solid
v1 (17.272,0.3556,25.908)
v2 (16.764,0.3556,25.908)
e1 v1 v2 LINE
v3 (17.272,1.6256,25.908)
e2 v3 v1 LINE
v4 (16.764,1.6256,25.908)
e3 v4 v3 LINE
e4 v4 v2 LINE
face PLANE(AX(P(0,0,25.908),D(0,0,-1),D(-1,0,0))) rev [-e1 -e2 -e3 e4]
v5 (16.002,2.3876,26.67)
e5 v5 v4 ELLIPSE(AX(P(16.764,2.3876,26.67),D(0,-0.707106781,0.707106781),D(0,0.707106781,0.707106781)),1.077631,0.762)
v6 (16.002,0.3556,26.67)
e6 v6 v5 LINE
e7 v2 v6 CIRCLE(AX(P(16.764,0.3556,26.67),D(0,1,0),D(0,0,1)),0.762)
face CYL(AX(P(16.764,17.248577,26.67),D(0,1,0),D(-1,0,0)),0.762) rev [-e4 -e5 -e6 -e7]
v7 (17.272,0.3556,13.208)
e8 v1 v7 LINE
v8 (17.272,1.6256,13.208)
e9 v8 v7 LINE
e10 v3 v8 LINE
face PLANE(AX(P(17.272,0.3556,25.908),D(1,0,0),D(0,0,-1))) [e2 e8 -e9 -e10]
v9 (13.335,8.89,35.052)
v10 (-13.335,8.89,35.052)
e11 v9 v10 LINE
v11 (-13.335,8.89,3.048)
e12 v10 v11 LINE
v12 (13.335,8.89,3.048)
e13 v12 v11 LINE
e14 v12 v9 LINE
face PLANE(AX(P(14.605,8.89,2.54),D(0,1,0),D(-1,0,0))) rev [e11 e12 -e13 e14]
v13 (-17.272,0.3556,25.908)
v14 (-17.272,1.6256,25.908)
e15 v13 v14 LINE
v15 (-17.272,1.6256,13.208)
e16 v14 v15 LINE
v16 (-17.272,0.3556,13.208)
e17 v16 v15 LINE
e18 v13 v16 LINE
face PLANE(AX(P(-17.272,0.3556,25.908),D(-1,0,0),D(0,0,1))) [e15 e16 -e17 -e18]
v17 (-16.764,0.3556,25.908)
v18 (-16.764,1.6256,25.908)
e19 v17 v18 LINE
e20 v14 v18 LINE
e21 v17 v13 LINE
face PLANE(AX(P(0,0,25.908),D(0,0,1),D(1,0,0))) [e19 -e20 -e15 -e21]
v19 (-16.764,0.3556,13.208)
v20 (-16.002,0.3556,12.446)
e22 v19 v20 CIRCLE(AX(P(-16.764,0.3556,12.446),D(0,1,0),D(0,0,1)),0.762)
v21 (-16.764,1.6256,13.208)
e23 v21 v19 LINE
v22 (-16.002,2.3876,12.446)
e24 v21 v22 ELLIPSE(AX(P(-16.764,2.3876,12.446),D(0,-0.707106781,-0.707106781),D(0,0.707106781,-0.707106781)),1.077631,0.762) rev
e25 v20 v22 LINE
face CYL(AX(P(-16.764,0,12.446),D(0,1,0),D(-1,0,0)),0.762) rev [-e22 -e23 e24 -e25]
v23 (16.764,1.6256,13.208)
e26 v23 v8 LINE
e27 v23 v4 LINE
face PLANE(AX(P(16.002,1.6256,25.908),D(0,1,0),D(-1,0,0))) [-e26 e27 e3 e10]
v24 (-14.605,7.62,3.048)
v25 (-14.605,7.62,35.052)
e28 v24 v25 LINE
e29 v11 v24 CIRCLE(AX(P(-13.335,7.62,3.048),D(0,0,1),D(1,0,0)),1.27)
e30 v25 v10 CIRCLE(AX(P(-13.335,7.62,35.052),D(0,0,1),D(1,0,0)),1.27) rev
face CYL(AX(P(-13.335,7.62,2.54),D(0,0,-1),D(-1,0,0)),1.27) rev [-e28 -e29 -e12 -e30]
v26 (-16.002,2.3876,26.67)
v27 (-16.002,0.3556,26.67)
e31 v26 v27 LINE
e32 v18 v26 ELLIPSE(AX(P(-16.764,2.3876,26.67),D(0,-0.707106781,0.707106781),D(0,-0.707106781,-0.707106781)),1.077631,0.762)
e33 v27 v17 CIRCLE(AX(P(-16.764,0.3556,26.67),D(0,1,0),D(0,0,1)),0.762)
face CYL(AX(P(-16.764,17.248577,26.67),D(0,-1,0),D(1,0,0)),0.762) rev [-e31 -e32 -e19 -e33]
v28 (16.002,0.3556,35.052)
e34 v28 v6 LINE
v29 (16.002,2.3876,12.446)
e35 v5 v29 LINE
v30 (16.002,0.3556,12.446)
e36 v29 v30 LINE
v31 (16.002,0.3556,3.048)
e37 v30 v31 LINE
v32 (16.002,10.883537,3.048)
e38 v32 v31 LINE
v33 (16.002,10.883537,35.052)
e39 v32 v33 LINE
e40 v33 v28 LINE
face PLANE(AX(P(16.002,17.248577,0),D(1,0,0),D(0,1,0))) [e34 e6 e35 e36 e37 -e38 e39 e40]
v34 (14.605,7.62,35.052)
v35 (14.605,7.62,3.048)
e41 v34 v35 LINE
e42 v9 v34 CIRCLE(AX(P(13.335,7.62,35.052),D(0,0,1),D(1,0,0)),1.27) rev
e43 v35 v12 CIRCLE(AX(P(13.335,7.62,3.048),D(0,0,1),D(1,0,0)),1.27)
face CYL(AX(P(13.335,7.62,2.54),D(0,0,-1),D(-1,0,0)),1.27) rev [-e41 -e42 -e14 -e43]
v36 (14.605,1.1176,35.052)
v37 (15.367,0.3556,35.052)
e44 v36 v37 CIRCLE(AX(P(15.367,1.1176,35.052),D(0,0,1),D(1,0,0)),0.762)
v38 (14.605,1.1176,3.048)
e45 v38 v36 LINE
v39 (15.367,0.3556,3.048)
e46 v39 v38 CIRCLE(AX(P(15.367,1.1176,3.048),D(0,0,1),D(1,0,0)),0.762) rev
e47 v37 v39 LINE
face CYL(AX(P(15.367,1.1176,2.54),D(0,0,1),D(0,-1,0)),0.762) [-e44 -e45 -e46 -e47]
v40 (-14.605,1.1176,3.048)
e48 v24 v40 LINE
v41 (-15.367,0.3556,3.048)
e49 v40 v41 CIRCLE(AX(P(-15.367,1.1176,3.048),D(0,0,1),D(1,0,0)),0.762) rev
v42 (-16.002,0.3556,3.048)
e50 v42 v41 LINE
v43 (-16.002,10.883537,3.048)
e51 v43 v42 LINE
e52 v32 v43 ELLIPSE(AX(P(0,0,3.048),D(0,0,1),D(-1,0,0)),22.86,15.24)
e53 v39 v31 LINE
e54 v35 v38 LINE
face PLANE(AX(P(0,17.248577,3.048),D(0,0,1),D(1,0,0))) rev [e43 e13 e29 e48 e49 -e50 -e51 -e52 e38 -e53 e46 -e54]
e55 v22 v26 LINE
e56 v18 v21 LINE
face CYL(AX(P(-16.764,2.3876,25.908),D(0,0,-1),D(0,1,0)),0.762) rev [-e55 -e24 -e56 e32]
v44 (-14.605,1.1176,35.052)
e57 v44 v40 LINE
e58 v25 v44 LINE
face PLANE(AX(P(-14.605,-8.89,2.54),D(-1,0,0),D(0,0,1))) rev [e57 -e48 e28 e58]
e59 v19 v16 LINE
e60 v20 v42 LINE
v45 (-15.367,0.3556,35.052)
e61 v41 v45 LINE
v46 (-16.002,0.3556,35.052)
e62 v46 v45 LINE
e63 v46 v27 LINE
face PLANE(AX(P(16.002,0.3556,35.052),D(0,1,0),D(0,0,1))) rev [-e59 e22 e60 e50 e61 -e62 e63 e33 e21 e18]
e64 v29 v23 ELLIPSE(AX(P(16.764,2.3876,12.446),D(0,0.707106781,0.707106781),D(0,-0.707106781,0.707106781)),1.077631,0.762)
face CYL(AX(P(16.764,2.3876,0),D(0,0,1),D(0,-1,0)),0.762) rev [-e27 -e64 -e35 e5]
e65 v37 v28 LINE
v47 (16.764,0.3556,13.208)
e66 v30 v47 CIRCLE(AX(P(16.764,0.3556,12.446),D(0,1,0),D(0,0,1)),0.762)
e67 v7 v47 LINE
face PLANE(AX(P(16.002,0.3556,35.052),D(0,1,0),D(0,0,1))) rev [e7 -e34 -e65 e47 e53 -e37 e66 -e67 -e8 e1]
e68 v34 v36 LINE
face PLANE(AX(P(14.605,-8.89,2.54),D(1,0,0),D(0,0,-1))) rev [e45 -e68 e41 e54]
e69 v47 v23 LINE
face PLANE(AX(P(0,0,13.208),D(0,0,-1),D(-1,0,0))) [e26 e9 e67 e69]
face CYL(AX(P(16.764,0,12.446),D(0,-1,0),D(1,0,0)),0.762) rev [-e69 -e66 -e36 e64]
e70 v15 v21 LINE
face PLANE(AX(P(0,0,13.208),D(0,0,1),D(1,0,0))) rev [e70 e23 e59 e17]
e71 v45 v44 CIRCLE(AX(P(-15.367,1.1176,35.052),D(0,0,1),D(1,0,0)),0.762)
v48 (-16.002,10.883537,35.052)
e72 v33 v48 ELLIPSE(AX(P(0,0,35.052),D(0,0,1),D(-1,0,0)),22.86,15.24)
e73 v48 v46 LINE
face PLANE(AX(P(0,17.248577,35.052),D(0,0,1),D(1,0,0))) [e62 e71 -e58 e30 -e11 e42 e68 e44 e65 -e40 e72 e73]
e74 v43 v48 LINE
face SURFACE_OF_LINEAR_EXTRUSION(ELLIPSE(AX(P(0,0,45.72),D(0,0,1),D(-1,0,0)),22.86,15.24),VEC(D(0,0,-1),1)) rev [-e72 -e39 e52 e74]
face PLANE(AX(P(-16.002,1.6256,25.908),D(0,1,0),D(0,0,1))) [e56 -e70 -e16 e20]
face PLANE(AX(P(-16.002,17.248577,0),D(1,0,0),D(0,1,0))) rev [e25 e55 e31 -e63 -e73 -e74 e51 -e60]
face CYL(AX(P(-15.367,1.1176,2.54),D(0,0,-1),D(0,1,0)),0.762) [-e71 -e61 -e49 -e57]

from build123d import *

# Parameters (mm, degrees)
SKETCH1_RX              = 22.86
SKETCH1_RY              = 15.24
BOSS_EXTRUDE4_DEPTH     = 45.72
CUT_EXTRUDE2_START      = -10.16
SKETCH4_W               = 29.21
SKETCH4_H               = 17.78
CUT_EXTRUDE2_DEPTH      = 33.02
CUT_EXTRUDE4_DEPTH      = 33.02
CUT_EXTRUDE4_DEPTH_BACK = 33.02
SKETCH7_W               = 14.643913221
SKETCH7_H               = 35.56
SKETCH8_R               = 1.75
CUT_EXTRUDE5_DEPTH      = 1.27
SKETCH9_R               = 0.5
CUT_EXTRUDE7_DEPTH      = 2.794
FILLET1_R               = 1.27
FILLET2_R               = 1.27
SKETCH10_W              = 45.72
SKETCH10_H              = 17.78
CUT_EXTRUDE8_DEPTH      = 47.972834865
CUT_EXTRUDE10_DEPTH     = 47.972834865
SKETCH15_W              = 29.21
SKETCH15_H              = 0.508
CUT_EXTRUDE13_DEPTH     = 42.866874941
SKETCH16_W              = 32.004
SKETCH16_H              = 0.3556
CUT_EXTRUDE14_DEPTH     = 39.891871036
BOSS_EXTRUDE5_START     = -10.16
SKETCH17_W              = 1.27
SKETCH17_H              = 1.27
BOSS_EXTRUDE5_DEPTH     = 12.7
FILLET3_R               = 0.762
FILLET4_R               = 0.762
FILLET5_R               = 0.762
FILLET6_R               = 1.27


with BuildPart() as part:
    # Sketch1 → Boss-Extrude4 (new body)
    with BuildSketch(Plane.XY):
        with Locations(Location((0, 0), (0, 0, 180))):
            Ellipse(SKETCH1_RX, SKETCH1_RY)
    extrude(amount=BOSS_EXTRUDE4_DEPTH)

    # Sketch4 → Cut-Extrude2 (cut)
    with BuildSketch(Plane.XY.offset(45.72).offset(CUT_EXTRUDE2_START)):
        Rectangle(SKETCH4_W, SKETCH4_H)
    extrude(amount=-CUT_EXTRUDE2_DEPTH, mode=Mode.SUBTRACT)

    # Sketch7 → Cut-Extrude4 (cut, two sides: drawn at the far end of the back side and taken through both)
    with BuildSketch(Plane(origin=(0, 0, 0), x_dir=(0, 0, -1), z_dir=(1, 0, 0)).offset(-CUT_EXTRUDE4_DEPTH_BACK)):
        with Locations((-45.421956611, -1.677648267)):
            Rectangle(SKETCH7_W, SKETCH7_H)
    extrude(amount=CUT_EXTRUDE4_DEPTH + CUT_EXTRUDE4_DEPTH_BACK, mode=Mode.SUBTRACT)

    # Sketch8 → Cut-Extrude5 (cut)
    with BuildSketch(Plane.XY):
        Circle(SKETCH8_R)
        with Locations((4.064, 0)):
            Circle(SKETCH8_R)
        with Locations((-4.064, 0)):
            Circle(SKETCH8_R)
    extrude(amount=CUT_EXTRUDE5_DEPTH, mode=Mode.SUBTRACT)

    # Sketch9 → Cut-Extrude7 (cut)
    with BuildSketch(Plane(origin=(0, 0, 0), x_dir=(-1, 0, 0), z_dir=(0, 0, -1))):
        with Locations((0, 0.8)):
            Circle(SKETCH9_R)
        with Locations((0, -0.8)):
            Circle(SKETCH9_R)
        with Locations((-4.064, 0.8)):
            Circle(SKETCH9_R)
        with Locations((-4.064, -0.8)):
            Circle(SKETCH9_R)
        with Locations((4.064, 0.8)):
            Circle(SKETCH9_R)
        with Locations((4.064, -0.8)):
            Circle(SKETCH9_R)
    extrude(amount=-CUT_EXTRUDE7_DEPTH, mode=Mode.SUBTRACT)

    # Fillet1
    fillet1_edges = [part.edges().sort_by_distance(p)[0] for p in [
        (22.859987041, 0.016227247, 0),
    ]]
    fillet(fillet1_edges, radius=FILLET1_R)

    # Fillet2
    fillet2_edges = [part.edges().sort_by_distance(p)[0] for p in [
        (22.860000074, 1.7e-08, 38.1),
    ]]
    fillet(fillet2_edges, radius=FILLET2_R)

    # Sketch10 → Cut-Extrude8 (cut, through all)
    with BuildSketch(Plane(origin=(0, 0, 0), x_dir=(-1, 0, 0), z_dir=(0, 0, -1))):
        with Locations((0, -8.89)):
            Rectangle(SKETCH10_W, SKETCH10_H)
    extrude(amount=-CUT_EXTRUDE8_DEPTH, mode=Mode.SUBTRACT)

    # Sketch13 → Cut-Extrude10 (cut, through all)
    with BuildSketch(Plane.XZ):
        with BuildLine():
            Line((-1.75, 1.27), (1.75, 1.27))
            Line((1.75, 1.27), (1.75, 0))
            Line((1.75, 0), (2.314, 0))
            Line((2.314, 0), (2.314, 1.27))
            Line((2.314, 1.27), (5.814, 1.27))
            Line((5.814, 1.27), (5.814, 0))
            Line((5.814, 0), (21.59, 0))
            ThreePointArc((21.59, 0), (22.488025612, 0.371974388), (22.86, 1.27))
            Line((22.86, 1.27), (22.86, 36.83))
            ThreePointArc((22.86, 36.83), (22.488025612, 37.728025612), (21.59, 38.1))
            Line((21.59, 38.1), (-21.59, 38.1))
            ThreePointArc((-21.59, 38.1), (-22.488025612, 37.728025612), (-22.86, 36.83))
            Line((-22.86, 36.83), (-22.86, 1.27))
            ThreePointArc((-22.86, 1.27), (-22.488025612, 0.371974388), (-21.59, 0))
            Line((-21.59, 0), (-5.814, 0))
            Line((-5.814, 0), (-5.814, 1.27))
            Line((-5.814, 1.27), (-2.314, 1.27))
            Line((-2.314, 1.27), (-2.314, 0))
            Line((-2.314, 0), (-1.75, 0))
            Line((-1.75, 0), (-1.75, 1.27))
        make_face()
        Polygon((16.002, 35.052), (16.002, 3.048), (14.605, 3.048), (14.605, 2.54), (-14.605, 2.54), (-14.605, 3.048), (-16.002, 3.048), (-16.002, 35.052), (-14.605, 35.052), (-14.605, 35.56), (14.605, 35.56), (14.605, 35.052), align=None, mode=Mode.SUBTRACT)
    extrude(amount=-CUT_EXTRUDE10_DEPTH, mode=Mode.SUBTRACT)


with BuildPart() as cut_extrude10_kept_piece:
    # of the separate pieces the step leaves, the one the design keeps (cut_extrude10_pieces_kept)
    add(part.part.solids().sort_by_distance((14.605, 11.724117119, 3.048))[0])

    # Sketch15 → Cut-Extrude13 (cut, through all)
    with BuildSketch(Plane(origin=(0, 0, 0), x_dir=(1, 0, 0), z_dir=(0, 1, 0))):
        with Locations((0, -2.794)):
            Rectangle(SKETCH15_W, SKETCH15_H)
        with Locations((0, -35.306)):
            Rectangle(SKETCH15_W, SKETCH15_H)
    extrude(amount=CUT_EXTRUDE13_DEPTH, mode=Mode.SUBTRACT)

    # Sketch16 → Cut-Extrude14 (cut, through all)
    with BuildSketch(Plane(origin=(0, 0, 3.048), x_dir=(-1, 0, 0), z_dir=(0, 0, -1))):
        with Locations((0, 0.1778)):
            Rectangle(SKETCH16_W, SKETCH16_H)
    extrude(amount=-CUT_EXTRUDE14_DEPTH, mode=Mode.SUBTRACT)

    # Sketch17 → Boss-Extrude5 (add)
    with BuildSketch(Plane(origin=(0, 0, 3.048), x_dir=(-1, 0, 0), z_dir=(0, 0, -1)).offset(BOSS_EXTRUDE5_START)):
        with Locations((-16.637, 0.9906)):
            Rectangle(SKETCH17_W, SKETCH17_H)
        with Locations((16.637, 0.9906)):
            Rectangle(SKETCH17_W, SKETCH17_H)
    extrude(amount=-BOSS_EXTRUDE5_DEPTH)

    # Fillet3
    fillet3_edges = [cut_extrude10_kept_piece.edges().sort_by_distance(p)[0] for p in [
        (16.002, 0.9906, 13.208),
        (16.002, 0.9906, 25.908),
        (16.002, 1.6256, 19.558),
    ]]
    fillet(fillet3_edges, radius=FILLET3_R)

    # Fillet4
    fillet4_edges = [cut_extrude10_kept_piece.edges().sort_by_distance(p)[0] for p in [
        (-16.002, 0.9906, 13.208),
        (-16.002, 1.6256, 19.558),
        (-16.002, 0.9906, 25.908),
    ]]
    fillet(fillet4_edges, radius=FILLET4_R)

    # Fillet5
    fillet5_edges = [cut_extrude10_kept_piece.edges().sort_by_distance(p)[0] for p in [
        (14.605, 0.3556, 19.05),
        (-14.605, 0.3556, 19.05),
    ]]
    fillet(fillet5_edges, radius=FILLET5_R)

    # Fillet6
    fillet6_edges = [cut_extrude10_kept_piece.edges().sort_by_distance(p)[0] for p in [
        (-14.605, 8.89, 19.05),
        (14.605, 8.89, 19.05),
    ]]
    fillet(fillet6_edges, radius=FILLET6_R)


solid = cut_extrude10_kept_piece.part
